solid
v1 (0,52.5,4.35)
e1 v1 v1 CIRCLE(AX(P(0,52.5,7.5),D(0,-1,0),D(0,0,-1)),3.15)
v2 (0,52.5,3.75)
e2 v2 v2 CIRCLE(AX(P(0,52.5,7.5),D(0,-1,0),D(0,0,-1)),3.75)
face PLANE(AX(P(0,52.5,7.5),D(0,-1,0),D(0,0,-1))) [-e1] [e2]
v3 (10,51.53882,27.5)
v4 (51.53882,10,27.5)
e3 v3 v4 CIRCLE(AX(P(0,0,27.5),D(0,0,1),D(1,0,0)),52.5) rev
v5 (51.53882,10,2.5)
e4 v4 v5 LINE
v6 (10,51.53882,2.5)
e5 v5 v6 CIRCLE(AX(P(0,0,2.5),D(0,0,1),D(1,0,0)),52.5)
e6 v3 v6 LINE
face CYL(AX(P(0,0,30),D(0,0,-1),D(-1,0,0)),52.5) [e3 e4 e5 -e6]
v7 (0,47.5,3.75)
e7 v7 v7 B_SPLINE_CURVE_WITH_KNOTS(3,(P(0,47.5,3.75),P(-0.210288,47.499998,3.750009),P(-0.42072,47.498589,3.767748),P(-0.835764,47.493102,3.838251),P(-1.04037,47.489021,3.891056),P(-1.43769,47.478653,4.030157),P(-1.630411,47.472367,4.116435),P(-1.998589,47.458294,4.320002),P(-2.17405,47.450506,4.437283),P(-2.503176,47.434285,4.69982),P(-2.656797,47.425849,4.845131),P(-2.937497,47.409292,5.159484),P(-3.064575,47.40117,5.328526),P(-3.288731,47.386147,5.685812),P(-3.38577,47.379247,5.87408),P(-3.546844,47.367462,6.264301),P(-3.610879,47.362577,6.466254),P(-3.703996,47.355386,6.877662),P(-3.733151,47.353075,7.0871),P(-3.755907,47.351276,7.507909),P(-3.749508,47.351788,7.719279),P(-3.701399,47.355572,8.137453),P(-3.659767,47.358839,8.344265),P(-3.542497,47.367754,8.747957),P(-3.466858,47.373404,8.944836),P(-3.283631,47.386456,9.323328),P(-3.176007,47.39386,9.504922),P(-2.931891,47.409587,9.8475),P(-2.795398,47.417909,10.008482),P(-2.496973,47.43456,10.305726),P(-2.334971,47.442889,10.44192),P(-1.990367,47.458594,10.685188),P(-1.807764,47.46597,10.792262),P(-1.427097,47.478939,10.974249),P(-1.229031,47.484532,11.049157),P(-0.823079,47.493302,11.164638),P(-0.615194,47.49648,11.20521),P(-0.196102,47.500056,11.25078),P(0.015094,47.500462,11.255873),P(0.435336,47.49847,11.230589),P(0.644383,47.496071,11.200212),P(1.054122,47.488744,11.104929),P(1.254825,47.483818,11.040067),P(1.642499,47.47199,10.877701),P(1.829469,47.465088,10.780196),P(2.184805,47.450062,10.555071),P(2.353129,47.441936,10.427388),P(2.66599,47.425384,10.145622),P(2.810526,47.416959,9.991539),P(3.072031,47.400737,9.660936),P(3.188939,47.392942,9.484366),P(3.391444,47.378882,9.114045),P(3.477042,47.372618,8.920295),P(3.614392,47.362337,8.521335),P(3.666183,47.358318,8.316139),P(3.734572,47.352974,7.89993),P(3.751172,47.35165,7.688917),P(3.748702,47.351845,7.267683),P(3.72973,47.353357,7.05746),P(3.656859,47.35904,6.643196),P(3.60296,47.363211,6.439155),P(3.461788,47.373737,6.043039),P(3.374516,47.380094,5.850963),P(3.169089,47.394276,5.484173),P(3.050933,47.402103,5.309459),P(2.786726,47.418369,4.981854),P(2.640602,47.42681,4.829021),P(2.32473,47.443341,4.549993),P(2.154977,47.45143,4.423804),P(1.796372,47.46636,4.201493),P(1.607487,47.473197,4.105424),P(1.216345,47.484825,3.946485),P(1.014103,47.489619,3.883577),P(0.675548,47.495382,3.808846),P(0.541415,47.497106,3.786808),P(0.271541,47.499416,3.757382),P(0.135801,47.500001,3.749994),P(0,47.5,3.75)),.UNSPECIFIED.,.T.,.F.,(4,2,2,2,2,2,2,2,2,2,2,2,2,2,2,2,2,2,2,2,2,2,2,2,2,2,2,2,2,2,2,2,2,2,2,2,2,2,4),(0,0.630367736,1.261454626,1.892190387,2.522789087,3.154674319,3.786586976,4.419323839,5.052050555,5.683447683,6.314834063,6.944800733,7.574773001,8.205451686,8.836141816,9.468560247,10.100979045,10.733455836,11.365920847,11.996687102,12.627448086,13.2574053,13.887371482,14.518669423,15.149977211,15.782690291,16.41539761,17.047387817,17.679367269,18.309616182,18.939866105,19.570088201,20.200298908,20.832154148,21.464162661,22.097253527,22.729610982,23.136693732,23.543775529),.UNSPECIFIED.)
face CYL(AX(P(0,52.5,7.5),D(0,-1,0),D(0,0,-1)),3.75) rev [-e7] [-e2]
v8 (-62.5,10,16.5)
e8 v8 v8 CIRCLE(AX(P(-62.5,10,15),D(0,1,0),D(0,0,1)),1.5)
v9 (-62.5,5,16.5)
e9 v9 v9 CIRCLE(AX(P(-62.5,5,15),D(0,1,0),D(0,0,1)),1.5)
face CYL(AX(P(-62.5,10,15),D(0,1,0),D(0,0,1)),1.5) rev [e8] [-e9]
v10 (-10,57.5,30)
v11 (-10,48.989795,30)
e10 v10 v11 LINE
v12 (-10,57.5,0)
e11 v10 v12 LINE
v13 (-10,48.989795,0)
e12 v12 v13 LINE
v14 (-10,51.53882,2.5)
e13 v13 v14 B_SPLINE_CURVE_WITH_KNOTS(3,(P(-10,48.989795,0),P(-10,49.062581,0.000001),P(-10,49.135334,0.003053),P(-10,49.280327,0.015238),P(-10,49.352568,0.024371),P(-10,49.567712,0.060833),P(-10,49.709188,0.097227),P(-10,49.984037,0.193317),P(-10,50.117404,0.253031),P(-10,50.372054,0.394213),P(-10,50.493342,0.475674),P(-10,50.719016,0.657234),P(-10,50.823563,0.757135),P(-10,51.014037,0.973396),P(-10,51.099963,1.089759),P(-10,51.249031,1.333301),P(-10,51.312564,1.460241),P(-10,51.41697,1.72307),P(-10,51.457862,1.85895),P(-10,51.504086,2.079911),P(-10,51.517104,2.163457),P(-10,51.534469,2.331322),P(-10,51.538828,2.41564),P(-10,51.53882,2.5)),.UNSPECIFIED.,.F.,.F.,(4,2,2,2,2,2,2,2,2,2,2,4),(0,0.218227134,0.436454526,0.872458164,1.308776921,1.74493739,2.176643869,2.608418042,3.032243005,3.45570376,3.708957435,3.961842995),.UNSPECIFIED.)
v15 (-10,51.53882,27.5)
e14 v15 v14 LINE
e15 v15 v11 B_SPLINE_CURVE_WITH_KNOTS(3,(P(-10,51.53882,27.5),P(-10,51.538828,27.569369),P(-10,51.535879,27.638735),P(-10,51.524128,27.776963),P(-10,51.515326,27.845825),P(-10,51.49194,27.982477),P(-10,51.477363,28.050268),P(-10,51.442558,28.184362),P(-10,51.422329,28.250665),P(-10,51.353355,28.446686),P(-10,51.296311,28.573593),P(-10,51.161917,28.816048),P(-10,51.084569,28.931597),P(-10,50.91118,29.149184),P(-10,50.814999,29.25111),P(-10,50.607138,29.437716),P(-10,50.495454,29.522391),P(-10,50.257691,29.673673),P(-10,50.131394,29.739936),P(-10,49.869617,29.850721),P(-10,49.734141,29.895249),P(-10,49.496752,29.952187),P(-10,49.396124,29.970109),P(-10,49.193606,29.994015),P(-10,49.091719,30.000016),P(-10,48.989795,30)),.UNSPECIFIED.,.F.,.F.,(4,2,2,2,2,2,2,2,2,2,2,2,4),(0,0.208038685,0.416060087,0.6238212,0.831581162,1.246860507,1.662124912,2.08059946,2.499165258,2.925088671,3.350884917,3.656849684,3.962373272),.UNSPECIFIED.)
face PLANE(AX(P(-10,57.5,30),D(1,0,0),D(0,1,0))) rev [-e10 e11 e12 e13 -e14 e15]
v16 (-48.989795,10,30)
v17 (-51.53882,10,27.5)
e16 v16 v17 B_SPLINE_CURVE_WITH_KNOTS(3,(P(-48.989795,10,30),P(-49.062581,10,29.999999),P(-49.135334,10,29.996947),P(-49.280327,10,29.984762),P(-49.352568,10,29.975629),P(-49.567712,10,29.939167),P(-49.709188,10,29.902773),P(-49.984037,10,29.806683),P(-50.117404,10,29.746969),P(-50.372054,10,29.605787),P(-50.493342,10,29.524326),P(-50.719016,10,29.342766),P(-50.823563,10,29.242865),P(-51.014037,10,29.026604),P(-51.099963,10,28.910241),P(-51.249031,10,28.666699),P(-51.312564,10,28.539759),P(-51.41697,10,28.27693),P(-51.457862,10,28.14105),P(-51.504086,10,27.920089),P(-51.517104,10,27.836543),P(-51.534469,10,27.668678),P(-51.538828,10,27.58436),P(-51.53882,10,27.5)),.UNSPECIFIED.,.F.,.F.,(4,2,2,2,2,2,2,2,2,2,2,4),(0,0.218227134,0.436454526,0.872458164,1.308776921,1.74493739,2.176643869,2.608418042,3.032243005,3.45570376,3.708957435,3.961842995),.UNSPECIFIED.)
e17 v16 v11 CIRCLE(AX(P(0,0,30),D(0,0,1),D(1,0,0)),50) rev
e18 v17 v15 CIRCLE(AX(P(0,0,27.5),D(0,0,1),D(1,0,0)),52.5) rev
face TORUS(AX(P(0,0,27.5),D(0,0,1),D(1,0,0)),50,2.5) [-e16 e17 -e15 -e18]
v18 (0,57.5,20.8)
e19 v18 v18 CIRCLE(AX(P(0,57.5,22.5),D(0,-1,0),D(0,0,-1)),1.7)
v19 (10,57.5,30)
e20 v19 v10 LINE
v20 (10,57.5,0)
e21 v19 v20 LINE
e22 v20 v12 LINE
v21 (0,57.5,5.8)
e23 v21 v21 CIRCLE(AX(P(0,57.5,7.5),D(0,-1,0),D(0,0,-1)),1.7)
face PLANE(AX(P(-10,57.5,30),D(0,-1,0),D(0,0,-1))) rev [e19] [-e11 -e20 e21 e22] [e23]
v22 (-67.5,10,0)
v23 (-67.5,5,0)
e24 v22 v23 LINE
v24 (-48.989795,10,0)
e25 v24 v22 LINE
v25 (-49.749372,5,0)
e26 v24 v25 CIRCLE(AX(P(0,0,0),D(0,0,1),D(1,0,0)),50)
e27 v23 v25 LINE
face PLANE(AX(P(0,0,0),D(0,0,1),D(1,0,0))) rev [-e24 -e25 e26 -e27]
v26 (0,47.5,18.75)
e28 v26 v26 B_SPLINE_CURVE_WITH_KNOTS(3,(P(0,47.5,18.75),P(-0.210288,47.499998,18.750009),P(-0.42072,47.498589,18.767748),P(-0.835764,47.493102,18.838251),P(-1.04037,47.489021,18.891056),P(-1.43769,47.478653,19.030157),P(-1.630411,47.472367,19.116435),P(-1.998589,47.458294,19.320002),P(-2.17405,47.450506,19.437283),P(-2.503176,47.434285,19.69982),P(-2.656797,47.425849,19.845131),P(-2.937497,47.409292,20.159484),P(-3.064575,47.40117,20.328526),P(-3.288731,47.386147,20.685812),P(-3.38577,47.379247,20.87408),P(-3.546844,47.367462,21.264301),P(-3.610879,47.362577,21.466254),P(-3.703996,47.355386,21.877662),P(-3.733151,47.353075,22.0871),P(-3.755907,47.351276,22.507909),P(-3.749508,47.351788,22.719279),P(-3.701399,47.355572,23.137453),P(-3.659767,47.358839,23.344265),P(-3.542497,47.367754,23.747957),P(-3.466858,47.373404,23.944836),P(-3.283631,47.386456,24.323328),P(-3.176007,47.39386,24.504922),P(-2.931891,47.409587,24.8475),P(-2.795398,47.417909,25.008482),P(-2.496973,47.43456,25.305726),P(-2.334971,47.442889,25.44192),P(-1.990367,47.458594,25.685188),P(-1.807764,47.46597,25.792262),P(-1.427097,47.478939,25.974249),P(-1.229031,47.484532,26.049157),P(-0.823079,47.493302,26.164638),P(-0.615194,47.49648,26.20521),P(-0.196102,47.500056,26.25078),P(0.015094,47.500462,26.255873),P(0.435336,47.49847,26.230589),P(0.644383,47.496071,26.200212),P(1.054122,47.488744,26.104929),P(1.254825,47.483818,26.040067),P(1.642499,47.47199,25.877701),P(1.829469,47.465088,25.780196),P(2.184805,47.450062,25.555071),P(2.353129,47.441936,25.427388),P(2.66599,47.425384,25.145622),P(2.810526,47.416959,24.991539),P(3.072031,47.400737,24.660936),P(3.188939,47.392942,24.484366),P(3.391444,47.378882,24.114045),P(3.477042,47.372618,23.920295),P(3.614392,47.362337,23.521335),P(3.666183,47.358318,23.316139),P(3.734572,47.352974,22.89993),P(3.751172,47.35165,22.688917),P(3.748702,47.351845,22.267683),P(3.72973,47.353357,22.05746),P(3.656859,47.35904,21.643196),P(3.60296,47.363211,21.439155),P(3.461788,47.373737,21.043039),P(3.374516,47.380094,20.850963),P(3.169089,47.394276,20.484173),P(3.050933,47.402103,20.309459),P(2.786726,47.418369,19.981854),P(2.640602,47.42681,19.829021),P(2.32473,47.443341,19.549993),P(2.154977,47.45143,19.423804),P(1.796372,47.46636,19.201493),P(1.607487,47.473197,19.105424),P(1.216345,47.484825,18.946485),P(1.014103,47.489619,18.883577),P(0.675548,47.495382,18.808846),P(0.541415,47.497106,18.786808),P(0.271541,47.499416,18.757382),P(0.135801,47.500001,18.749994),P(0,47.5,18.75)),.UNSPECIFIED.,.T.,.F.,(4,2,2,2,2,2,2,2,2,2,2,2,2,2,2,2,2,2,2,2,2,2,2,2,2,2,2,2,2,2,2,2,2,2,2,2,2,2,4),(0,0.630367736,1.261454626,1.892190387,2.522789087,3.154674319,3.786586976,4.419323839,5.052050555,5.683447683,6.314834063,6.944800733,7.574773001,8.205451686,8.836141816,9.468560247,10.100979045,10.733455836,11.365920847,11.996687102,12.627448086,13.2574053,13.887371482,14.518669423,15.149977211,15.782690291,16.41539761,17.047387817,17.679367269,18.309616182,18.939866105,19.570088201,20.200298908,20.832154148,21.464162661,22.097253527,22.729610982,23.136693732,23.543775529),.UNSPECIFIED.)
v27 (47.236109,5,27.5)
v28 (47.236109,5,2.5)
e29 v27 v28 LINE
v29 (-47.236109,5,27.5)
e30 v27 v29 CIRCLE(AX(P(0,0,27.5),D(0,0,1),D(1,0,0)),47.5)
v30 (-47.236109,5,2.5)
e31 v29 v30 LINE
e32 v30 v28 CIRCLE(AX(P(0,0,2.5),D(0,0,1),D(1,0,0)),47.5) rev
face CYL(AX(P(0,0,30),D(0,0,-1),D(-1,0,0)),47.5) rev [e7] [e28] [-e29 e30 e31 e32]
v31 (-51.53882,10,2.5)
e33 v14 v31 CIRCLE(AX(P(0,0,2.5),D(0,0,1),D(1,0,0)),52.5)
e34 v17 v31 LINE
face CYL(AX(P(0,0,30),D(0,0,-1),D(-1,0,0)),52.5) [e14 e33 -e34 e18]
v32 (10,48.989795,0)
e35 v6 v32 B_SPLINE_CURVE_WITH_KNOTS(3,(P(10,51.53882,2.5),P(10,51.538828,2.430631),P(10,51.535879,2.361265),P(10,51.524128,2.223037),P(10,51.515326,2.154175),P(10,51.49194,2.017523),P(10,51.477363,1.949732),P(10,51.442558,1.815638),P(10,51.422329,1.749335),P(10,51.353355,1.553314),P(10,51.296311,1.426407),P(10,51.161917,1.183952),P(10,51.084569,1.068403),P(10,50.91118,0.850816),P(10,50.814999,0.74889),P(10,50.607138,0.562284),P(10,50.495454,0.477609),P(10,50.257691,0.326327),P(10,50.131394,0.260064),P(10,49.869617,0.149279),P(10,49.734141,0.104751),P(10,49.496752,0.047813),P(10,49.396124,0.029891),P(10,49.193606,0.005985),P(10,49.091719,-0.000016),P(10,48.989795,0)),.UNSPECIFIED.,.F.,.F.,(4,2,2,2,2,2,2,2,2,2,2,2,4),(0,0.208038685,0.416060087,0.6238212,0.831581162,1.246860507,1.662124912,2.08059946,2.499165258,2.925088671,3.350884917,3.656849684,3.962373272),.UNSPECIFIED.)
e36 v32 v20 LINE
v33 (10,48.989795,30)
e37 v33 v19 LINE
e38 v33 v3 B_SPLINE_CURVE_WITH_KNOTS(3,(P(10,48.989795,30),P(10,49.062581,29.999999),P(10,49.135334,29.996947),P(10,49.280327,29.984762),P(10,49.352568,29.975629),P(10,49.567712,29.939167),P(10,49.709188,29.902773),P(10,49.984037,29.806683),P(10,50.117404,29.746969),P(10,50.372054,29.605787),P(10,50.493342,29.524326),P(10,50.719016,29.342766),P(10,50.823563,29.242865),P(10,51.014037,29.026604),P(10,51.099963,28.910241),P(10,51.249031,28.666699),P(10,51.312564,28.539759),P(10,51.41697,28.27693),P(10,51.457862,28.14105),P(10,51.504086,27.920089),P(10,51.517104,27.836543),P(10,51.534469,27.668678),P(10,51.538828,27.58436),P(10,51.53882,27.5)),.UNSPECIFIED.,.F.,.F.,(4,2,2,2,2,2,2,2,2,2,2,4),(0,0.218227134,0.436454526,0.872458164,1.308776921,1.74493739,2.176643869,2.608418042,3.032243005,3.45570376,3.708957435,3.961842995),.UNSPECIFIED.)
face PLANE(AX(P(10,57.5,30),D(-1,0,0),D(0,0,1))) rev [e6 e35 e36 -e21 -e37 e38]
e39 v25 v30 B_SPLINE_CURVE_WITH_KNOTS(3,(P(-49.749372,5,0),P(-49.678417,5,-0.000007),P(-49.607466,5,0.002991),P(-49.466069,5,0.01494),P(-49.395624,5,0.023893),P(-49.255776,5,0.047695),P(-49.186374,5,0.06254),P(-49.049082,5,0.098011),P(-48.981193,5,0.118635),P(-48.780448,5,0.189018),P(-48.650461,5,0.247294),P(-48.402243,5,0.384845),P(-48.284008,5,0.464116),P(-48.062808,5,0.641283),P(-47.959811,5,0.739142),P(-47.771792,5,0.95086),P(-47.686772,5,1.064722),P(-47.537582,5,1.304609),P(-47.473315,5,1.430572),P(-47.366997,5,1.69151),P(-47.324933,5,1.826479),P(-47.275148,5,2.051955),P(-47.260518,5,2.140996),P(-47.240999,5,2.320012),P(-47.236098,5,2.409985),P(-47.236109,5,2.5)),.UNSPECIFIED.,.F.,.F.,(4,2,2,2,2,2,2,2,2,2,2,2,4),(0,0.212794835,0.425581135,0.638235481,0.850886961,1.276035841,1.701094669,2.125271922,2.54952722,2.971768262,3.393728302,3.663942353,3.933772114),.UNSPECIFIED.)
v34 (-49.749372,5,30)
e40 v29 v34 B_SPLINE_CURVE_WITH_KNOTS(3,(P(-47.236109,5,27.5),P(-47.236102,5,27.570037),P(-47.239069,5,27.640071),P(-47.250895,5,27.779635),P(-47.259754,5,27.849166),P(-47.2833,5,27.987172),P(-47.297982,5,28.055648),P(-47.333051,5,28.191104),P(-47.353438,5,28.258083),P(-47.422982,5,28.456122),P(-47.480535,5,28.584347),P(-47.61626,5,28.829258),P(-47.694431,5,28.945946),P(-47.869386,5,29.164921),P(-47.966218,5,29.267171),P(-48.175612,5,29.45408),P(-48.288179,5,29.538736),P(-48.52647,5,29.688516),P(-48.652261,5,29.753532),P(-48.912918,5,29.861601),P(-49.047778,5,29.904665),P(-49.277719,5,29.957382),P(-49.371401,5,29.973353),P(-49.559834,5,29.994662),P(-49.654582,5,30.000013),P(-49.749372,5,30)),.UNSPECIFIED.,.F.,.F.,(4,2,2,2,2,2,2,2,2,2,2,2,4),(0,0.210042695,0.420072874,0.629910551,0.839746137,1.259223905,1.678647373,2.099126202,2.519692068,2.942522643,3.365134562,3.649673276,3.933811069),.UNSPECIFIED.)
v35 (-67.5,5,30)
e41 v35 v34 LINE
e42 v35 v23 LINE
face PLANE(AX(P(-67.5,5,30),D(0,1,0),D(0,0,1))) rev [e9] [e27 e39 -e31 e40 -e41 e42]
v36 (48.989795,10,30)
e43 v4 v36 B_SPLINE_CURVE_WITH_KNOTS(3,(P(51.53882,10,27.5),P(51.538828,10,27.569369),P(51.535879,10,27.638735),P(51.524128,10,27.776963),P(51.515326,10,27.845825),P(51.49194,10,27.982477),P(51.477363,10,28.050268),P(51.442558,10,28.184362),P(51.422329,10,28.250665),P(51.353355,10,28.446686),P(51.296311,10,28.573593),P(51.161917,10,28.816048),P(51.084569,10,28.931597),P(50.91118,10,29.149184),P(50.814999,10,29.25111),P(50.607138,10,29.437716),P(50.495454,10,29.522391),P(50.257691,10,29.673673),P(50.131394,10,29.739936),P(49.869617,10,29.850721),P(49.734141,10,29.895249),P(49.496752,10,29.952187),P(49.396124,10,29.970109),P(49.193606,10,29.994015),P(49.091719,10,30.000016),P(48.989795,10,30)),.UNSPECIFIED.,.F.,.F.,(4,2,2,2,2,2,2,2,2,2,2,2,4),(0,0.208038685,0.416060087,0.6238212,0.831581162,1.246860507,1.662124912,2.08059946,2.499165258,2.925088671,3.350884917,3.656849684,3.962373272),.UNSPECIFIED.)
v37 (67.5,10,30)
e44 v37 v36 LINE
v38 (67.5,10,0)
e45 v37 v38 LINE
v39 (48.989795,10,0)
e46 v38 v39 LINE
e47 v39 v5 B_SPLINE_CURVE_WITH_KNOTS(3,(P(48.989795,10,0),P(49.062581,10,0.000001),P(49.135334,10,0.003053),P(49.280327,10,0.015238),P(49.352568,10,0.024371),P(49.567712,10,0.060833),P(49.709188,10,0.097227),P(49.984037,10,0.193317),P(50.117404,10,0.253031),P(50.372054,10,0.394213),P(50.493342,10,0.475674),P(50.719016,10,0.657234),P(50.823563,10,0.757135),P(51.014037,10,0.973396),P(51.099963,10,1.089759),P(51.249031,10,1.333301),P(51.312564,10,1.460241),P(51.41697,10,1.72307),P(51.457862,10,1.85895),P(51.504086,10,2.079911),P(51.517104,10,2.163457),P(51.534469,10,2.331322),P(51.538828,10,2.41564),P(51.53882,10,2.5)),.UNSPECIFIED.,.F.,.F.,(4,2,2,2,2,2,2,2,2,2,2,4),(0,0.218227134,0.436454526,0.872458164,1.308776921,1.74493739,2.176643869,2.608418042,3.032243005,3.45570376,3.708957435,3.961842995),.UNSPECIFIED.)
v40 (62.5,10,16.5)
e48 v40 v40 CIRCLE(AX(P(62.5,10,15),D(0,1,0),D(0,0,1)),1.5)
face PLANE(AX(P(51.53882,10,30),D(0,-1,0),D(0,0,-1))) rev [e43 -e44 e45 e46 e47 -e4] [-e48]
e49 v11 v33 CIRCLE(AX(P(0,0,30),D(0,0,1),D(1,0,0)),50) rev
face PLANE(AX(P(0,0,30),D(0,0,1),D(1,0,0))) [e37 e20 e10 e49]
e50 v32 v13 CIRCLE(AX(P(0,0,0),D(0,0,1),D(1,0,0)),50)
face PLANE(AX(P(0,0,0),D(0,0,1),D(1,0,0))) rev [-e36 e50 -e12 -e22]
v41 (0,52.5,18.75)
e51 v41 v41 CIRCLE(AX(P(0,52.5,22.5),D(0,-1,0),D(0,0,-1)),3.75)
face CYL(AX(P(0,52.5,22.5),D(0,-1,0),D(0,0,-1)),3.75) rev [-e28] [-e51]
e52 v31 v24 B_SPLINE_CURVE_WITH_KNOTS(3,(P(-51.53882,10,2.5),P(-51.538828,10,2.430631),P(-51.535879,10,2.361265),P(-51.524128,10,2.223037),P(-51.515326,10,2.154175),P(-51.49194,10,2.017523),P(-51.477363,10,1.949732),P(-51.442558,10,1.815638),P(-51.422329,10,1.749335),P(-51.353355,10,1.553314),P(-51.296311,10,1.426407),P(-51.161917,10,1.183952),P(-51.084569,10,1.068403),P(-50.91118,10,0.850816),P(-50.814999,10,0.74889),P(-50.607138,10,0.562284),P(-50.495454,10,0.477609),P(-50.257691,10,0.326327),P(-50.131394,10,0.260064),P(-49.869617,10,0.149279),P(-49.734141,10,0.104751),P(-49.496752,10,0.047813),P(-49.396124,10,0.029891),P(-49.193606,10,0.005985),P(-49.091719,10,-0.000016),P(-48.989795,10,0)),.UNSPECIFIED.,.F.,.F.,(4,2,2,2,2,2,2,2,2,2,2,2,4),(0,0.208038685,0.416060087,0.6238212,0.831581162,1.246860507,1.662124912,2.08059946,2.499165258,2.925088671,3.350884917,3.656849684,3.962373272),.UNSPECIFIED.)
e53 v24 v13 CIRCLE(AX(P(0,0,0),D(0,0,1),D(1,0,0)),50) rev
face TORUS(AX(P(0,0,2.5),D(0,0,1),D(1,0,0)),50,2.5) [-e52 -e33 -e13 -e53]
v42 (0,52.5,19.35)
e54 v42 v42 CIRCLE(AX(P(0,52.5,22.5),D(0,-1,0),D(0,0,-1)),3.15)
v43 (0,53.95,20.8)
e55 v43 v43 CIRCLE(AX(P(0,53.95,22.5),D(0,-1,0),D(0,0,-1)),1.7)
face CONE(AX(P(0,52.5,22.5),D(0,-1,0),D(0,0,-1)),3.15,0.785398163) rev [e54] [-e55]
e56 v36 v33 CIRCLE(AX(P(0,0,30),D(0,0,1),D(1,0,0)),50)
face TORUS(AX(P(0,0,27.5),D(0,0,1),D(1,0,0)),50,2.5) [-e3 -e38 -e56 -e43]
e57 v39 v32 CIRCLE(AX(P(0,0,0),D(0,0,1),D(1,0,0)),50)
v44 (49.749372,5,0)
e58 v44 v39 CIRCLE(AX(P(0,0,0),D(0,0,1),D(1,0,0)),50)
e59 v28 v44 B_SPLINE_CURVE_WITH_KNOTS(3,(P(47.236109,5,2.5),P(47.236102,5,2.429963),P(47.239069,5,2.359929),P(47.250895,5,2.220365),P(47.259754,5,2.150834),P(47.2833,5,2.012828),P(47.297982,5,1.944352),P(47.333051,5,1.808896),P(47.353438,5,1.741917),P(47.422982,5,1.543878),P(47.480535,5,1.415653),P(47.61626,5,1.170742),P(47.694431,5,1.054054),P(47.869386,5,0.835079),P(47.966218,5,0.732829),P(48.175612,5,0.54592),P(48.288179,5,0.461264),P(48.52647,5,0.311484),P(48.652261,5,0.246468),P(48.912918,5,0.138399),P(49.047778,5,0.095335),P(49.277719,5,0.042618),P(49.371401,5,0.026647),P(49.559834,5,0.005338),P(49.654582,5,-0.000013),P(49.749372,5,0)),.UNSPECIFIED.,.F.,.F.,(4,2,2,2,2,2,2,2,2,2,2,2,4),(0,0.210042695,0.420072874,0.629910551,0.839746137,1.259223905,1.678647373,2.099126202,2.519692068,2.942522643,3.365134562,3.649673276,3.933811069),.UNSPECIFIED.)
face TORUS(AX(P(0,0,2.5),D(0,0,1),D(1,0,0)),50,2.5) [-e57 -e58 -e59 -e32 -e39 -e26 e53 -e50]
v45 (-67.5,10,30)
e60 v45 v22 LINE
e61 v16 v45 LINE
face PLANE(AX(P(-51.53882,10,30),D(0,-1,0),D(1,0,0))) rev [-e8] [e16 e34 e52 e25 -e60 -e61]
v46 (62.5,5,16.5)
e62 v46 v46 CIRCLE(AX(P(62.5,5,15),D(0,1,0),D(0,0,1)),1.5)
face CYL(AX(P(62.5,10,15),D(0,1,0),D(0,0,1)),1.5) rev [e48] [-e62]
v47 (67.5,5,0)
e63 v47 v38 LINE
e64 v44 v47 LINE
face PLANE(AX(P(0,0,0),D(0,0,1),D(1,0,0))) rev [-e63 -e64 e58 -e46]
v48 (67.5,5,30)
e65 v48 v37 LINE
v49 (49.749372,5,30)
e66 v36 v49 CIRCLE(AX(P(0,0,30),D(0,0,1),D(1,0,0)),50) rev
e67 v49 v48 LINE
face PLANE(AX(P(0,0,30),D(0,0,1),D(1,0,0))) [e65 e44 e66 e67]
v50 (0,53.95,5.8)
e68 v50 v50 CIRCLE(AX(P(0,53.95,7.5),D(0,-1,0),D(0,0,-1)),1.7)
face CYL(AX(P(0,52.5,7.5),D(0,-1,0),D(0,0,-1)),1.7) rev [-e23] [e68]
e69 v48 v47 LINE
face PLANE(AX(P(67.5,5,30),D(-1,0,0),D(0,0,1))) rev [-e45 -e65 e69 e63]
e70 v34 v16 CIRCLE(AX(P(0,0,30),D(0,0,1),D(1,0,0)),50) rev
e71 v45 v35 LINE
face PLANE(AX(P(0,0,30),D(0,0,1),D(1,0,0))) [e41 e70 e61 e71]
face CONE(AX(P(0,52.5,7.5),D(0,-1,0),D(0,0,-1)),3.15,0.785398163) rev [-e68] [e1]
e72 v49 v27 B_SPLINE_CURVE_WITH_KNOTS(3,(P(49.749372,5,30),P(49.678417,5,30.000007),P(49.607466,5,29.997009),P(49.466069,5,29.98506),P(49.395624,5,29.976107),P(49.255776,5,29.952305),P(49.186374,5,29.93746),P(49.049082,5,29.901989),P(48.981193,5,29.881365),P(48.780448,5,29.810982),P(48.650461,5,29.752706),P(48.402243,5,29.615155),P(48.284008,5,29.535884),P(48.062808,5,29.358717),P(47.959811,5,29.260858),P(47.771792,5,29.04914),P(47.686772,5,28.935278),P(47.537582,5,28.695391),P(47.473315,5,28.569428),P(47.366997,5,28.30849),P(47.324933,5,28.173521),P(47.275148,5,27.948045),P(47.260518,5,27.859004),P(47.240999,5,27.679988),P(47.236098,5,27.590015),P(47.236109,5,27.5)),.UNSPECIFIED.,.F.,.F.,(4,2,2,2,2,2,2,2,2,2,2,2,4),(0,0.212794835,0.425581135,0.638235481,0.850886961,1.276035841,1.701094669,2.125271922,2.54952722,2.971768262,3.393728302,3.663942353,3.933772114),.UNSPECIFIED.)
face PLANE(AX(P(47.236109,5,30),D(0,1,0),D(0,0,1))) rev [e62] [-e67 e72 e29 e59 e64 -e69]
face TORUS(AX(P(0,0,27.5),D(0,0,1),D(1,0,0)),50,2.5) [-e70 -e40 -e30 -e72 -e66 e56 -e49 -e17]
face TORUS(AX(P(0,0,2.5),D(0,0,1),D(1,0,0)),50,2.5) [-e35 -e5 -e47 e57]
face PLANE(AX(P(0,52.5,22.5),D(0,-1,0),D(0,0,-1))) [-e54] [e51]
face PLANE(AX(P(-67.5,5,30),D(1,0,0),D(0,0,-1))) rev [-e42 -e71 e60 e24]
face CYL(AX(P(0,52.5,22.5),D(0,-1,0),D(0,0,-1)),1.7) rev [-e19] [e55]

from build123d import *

# Parameters (mm, degrees)
BOSS_EXTRUDE1_DEPTH                             = 30
FILLET1_R                                       = 2.5
SKETCH6_R                                       = 3.75
CUT_EXTRUDE1_DEPTH                              = 47.5
CSK_FOR_M3_FLAT_HEAD_MACHINE_SCREW1_D           = 3.4
CSK_FOR_M3_FLAT_HEAD_MACHINE_SCREW1_CSINK_D     = 6.3
CSK_FOR_M3_FLAT_HEAD_MACHINE_SCREW1_CSINK_ANGLE = 90
F_3_0MM_DOWEL_HOLE1_D                           = 3


with BuildPart() as part:
    # Sketch1 → Boss-Extrude1 (new body)
    with BuildSketch(Plane.XY):
        with BuildLine():
            Line((47.236109069, 5), (67.5, 5))
            Line((67.5, 5), (67.5, 10))
            Line((67.5, 10), (51.53882032, 10))
            ThreePointArc((51.53882032, 10), (37.123106012, 37.123106012), (10, 51.53882032))
            Line((10, 51.53882032), (10, 57.5))
            Line((10, 57.5), (-10, 57.5))
            Line((-10, 57.5), (-10, 51.53882032))
            ThreePointArc((-10, 51.53882032), (-37.123106012, 37.123106012), (-51.53882032, 10))
            Line((-51.53882032, 10), (-67.5, 10))
            Line((-67.5, 10), (-67.5, 5))
            Line((-67.5, 5), (-47.236109069, 5))
            ThreePointArc((-47.236109069, 5), (0, 47.5), (47.236109069, 5))
        make_face()
    extrude(amount=BOSS_EXTRUDE1_DEPTH)

    # Fillet1
    fillet1_edges = [part.edges().sort_by_distance(p)[0] for p in [
        (37.123106012, 37.123106012, 0),
        (0, 47.5, 0),
        (-37.123106012, 37.123106012, 0),
        (0, 47.5, 30),
        (37.123106012, 37.123106012, 30),
        (-37.123106012, 37.123106012, 30),
    ]]
    fillet(fillet1_edges, radius=FILLET1_R - 0.0001)  # a hair under: the kernel refuses the full size

    # Sketch6 → Cut-Extrude1 (cut)
    with BuildSketch(Plane.XZ.offset(-5)):
        with Locations(Location((0, 22.5, 0), (0, 0, 270))):
            Circle(SKETCH6_R)
        with Locations(Location((0, 7.5, 0), (0, 0, 270))):
            Circle(SKETCH6_R)
    extrude(amount=-CUT_EXTRUDE1_DEPTH, mode=Mode.SUBTRACT)

    # CSK for M3 Flat Head Machine Screw1 (through all)
    with Locations(Plane(origin=(0, 52.5, 0), x_dir=(-1, 0, 0), z_dir=(0, -1, 0))):
        with Locations((0, -22.5), (0, -7.5)):
            CounterSinkHole(CSK_FOR_M3_FLAT_HEAD_MACHINE_SCREW1_D / 2, CSK_FOR_M3_FLAT_HEAD_MACHINE_SCREW1_CSINK_D / 2, counter_sink_angle=CSK_FOR_M3_FLAT_HEAD_MACHINE_SCREW1_CSINK_ANGLE)

    # Ø3.0mm Dowel Hole1 (through all)
    with Locations(Plane(origin=(0, 10, 0), x_dir=(1, 0, 0), z_dir=(0, 1, 0))):
        with Locations((-62.5, -15), (62.5, -15)):
            Hole(F_3_0MM_DOWEL_HOLE1_D / 2)


solid = part.part
